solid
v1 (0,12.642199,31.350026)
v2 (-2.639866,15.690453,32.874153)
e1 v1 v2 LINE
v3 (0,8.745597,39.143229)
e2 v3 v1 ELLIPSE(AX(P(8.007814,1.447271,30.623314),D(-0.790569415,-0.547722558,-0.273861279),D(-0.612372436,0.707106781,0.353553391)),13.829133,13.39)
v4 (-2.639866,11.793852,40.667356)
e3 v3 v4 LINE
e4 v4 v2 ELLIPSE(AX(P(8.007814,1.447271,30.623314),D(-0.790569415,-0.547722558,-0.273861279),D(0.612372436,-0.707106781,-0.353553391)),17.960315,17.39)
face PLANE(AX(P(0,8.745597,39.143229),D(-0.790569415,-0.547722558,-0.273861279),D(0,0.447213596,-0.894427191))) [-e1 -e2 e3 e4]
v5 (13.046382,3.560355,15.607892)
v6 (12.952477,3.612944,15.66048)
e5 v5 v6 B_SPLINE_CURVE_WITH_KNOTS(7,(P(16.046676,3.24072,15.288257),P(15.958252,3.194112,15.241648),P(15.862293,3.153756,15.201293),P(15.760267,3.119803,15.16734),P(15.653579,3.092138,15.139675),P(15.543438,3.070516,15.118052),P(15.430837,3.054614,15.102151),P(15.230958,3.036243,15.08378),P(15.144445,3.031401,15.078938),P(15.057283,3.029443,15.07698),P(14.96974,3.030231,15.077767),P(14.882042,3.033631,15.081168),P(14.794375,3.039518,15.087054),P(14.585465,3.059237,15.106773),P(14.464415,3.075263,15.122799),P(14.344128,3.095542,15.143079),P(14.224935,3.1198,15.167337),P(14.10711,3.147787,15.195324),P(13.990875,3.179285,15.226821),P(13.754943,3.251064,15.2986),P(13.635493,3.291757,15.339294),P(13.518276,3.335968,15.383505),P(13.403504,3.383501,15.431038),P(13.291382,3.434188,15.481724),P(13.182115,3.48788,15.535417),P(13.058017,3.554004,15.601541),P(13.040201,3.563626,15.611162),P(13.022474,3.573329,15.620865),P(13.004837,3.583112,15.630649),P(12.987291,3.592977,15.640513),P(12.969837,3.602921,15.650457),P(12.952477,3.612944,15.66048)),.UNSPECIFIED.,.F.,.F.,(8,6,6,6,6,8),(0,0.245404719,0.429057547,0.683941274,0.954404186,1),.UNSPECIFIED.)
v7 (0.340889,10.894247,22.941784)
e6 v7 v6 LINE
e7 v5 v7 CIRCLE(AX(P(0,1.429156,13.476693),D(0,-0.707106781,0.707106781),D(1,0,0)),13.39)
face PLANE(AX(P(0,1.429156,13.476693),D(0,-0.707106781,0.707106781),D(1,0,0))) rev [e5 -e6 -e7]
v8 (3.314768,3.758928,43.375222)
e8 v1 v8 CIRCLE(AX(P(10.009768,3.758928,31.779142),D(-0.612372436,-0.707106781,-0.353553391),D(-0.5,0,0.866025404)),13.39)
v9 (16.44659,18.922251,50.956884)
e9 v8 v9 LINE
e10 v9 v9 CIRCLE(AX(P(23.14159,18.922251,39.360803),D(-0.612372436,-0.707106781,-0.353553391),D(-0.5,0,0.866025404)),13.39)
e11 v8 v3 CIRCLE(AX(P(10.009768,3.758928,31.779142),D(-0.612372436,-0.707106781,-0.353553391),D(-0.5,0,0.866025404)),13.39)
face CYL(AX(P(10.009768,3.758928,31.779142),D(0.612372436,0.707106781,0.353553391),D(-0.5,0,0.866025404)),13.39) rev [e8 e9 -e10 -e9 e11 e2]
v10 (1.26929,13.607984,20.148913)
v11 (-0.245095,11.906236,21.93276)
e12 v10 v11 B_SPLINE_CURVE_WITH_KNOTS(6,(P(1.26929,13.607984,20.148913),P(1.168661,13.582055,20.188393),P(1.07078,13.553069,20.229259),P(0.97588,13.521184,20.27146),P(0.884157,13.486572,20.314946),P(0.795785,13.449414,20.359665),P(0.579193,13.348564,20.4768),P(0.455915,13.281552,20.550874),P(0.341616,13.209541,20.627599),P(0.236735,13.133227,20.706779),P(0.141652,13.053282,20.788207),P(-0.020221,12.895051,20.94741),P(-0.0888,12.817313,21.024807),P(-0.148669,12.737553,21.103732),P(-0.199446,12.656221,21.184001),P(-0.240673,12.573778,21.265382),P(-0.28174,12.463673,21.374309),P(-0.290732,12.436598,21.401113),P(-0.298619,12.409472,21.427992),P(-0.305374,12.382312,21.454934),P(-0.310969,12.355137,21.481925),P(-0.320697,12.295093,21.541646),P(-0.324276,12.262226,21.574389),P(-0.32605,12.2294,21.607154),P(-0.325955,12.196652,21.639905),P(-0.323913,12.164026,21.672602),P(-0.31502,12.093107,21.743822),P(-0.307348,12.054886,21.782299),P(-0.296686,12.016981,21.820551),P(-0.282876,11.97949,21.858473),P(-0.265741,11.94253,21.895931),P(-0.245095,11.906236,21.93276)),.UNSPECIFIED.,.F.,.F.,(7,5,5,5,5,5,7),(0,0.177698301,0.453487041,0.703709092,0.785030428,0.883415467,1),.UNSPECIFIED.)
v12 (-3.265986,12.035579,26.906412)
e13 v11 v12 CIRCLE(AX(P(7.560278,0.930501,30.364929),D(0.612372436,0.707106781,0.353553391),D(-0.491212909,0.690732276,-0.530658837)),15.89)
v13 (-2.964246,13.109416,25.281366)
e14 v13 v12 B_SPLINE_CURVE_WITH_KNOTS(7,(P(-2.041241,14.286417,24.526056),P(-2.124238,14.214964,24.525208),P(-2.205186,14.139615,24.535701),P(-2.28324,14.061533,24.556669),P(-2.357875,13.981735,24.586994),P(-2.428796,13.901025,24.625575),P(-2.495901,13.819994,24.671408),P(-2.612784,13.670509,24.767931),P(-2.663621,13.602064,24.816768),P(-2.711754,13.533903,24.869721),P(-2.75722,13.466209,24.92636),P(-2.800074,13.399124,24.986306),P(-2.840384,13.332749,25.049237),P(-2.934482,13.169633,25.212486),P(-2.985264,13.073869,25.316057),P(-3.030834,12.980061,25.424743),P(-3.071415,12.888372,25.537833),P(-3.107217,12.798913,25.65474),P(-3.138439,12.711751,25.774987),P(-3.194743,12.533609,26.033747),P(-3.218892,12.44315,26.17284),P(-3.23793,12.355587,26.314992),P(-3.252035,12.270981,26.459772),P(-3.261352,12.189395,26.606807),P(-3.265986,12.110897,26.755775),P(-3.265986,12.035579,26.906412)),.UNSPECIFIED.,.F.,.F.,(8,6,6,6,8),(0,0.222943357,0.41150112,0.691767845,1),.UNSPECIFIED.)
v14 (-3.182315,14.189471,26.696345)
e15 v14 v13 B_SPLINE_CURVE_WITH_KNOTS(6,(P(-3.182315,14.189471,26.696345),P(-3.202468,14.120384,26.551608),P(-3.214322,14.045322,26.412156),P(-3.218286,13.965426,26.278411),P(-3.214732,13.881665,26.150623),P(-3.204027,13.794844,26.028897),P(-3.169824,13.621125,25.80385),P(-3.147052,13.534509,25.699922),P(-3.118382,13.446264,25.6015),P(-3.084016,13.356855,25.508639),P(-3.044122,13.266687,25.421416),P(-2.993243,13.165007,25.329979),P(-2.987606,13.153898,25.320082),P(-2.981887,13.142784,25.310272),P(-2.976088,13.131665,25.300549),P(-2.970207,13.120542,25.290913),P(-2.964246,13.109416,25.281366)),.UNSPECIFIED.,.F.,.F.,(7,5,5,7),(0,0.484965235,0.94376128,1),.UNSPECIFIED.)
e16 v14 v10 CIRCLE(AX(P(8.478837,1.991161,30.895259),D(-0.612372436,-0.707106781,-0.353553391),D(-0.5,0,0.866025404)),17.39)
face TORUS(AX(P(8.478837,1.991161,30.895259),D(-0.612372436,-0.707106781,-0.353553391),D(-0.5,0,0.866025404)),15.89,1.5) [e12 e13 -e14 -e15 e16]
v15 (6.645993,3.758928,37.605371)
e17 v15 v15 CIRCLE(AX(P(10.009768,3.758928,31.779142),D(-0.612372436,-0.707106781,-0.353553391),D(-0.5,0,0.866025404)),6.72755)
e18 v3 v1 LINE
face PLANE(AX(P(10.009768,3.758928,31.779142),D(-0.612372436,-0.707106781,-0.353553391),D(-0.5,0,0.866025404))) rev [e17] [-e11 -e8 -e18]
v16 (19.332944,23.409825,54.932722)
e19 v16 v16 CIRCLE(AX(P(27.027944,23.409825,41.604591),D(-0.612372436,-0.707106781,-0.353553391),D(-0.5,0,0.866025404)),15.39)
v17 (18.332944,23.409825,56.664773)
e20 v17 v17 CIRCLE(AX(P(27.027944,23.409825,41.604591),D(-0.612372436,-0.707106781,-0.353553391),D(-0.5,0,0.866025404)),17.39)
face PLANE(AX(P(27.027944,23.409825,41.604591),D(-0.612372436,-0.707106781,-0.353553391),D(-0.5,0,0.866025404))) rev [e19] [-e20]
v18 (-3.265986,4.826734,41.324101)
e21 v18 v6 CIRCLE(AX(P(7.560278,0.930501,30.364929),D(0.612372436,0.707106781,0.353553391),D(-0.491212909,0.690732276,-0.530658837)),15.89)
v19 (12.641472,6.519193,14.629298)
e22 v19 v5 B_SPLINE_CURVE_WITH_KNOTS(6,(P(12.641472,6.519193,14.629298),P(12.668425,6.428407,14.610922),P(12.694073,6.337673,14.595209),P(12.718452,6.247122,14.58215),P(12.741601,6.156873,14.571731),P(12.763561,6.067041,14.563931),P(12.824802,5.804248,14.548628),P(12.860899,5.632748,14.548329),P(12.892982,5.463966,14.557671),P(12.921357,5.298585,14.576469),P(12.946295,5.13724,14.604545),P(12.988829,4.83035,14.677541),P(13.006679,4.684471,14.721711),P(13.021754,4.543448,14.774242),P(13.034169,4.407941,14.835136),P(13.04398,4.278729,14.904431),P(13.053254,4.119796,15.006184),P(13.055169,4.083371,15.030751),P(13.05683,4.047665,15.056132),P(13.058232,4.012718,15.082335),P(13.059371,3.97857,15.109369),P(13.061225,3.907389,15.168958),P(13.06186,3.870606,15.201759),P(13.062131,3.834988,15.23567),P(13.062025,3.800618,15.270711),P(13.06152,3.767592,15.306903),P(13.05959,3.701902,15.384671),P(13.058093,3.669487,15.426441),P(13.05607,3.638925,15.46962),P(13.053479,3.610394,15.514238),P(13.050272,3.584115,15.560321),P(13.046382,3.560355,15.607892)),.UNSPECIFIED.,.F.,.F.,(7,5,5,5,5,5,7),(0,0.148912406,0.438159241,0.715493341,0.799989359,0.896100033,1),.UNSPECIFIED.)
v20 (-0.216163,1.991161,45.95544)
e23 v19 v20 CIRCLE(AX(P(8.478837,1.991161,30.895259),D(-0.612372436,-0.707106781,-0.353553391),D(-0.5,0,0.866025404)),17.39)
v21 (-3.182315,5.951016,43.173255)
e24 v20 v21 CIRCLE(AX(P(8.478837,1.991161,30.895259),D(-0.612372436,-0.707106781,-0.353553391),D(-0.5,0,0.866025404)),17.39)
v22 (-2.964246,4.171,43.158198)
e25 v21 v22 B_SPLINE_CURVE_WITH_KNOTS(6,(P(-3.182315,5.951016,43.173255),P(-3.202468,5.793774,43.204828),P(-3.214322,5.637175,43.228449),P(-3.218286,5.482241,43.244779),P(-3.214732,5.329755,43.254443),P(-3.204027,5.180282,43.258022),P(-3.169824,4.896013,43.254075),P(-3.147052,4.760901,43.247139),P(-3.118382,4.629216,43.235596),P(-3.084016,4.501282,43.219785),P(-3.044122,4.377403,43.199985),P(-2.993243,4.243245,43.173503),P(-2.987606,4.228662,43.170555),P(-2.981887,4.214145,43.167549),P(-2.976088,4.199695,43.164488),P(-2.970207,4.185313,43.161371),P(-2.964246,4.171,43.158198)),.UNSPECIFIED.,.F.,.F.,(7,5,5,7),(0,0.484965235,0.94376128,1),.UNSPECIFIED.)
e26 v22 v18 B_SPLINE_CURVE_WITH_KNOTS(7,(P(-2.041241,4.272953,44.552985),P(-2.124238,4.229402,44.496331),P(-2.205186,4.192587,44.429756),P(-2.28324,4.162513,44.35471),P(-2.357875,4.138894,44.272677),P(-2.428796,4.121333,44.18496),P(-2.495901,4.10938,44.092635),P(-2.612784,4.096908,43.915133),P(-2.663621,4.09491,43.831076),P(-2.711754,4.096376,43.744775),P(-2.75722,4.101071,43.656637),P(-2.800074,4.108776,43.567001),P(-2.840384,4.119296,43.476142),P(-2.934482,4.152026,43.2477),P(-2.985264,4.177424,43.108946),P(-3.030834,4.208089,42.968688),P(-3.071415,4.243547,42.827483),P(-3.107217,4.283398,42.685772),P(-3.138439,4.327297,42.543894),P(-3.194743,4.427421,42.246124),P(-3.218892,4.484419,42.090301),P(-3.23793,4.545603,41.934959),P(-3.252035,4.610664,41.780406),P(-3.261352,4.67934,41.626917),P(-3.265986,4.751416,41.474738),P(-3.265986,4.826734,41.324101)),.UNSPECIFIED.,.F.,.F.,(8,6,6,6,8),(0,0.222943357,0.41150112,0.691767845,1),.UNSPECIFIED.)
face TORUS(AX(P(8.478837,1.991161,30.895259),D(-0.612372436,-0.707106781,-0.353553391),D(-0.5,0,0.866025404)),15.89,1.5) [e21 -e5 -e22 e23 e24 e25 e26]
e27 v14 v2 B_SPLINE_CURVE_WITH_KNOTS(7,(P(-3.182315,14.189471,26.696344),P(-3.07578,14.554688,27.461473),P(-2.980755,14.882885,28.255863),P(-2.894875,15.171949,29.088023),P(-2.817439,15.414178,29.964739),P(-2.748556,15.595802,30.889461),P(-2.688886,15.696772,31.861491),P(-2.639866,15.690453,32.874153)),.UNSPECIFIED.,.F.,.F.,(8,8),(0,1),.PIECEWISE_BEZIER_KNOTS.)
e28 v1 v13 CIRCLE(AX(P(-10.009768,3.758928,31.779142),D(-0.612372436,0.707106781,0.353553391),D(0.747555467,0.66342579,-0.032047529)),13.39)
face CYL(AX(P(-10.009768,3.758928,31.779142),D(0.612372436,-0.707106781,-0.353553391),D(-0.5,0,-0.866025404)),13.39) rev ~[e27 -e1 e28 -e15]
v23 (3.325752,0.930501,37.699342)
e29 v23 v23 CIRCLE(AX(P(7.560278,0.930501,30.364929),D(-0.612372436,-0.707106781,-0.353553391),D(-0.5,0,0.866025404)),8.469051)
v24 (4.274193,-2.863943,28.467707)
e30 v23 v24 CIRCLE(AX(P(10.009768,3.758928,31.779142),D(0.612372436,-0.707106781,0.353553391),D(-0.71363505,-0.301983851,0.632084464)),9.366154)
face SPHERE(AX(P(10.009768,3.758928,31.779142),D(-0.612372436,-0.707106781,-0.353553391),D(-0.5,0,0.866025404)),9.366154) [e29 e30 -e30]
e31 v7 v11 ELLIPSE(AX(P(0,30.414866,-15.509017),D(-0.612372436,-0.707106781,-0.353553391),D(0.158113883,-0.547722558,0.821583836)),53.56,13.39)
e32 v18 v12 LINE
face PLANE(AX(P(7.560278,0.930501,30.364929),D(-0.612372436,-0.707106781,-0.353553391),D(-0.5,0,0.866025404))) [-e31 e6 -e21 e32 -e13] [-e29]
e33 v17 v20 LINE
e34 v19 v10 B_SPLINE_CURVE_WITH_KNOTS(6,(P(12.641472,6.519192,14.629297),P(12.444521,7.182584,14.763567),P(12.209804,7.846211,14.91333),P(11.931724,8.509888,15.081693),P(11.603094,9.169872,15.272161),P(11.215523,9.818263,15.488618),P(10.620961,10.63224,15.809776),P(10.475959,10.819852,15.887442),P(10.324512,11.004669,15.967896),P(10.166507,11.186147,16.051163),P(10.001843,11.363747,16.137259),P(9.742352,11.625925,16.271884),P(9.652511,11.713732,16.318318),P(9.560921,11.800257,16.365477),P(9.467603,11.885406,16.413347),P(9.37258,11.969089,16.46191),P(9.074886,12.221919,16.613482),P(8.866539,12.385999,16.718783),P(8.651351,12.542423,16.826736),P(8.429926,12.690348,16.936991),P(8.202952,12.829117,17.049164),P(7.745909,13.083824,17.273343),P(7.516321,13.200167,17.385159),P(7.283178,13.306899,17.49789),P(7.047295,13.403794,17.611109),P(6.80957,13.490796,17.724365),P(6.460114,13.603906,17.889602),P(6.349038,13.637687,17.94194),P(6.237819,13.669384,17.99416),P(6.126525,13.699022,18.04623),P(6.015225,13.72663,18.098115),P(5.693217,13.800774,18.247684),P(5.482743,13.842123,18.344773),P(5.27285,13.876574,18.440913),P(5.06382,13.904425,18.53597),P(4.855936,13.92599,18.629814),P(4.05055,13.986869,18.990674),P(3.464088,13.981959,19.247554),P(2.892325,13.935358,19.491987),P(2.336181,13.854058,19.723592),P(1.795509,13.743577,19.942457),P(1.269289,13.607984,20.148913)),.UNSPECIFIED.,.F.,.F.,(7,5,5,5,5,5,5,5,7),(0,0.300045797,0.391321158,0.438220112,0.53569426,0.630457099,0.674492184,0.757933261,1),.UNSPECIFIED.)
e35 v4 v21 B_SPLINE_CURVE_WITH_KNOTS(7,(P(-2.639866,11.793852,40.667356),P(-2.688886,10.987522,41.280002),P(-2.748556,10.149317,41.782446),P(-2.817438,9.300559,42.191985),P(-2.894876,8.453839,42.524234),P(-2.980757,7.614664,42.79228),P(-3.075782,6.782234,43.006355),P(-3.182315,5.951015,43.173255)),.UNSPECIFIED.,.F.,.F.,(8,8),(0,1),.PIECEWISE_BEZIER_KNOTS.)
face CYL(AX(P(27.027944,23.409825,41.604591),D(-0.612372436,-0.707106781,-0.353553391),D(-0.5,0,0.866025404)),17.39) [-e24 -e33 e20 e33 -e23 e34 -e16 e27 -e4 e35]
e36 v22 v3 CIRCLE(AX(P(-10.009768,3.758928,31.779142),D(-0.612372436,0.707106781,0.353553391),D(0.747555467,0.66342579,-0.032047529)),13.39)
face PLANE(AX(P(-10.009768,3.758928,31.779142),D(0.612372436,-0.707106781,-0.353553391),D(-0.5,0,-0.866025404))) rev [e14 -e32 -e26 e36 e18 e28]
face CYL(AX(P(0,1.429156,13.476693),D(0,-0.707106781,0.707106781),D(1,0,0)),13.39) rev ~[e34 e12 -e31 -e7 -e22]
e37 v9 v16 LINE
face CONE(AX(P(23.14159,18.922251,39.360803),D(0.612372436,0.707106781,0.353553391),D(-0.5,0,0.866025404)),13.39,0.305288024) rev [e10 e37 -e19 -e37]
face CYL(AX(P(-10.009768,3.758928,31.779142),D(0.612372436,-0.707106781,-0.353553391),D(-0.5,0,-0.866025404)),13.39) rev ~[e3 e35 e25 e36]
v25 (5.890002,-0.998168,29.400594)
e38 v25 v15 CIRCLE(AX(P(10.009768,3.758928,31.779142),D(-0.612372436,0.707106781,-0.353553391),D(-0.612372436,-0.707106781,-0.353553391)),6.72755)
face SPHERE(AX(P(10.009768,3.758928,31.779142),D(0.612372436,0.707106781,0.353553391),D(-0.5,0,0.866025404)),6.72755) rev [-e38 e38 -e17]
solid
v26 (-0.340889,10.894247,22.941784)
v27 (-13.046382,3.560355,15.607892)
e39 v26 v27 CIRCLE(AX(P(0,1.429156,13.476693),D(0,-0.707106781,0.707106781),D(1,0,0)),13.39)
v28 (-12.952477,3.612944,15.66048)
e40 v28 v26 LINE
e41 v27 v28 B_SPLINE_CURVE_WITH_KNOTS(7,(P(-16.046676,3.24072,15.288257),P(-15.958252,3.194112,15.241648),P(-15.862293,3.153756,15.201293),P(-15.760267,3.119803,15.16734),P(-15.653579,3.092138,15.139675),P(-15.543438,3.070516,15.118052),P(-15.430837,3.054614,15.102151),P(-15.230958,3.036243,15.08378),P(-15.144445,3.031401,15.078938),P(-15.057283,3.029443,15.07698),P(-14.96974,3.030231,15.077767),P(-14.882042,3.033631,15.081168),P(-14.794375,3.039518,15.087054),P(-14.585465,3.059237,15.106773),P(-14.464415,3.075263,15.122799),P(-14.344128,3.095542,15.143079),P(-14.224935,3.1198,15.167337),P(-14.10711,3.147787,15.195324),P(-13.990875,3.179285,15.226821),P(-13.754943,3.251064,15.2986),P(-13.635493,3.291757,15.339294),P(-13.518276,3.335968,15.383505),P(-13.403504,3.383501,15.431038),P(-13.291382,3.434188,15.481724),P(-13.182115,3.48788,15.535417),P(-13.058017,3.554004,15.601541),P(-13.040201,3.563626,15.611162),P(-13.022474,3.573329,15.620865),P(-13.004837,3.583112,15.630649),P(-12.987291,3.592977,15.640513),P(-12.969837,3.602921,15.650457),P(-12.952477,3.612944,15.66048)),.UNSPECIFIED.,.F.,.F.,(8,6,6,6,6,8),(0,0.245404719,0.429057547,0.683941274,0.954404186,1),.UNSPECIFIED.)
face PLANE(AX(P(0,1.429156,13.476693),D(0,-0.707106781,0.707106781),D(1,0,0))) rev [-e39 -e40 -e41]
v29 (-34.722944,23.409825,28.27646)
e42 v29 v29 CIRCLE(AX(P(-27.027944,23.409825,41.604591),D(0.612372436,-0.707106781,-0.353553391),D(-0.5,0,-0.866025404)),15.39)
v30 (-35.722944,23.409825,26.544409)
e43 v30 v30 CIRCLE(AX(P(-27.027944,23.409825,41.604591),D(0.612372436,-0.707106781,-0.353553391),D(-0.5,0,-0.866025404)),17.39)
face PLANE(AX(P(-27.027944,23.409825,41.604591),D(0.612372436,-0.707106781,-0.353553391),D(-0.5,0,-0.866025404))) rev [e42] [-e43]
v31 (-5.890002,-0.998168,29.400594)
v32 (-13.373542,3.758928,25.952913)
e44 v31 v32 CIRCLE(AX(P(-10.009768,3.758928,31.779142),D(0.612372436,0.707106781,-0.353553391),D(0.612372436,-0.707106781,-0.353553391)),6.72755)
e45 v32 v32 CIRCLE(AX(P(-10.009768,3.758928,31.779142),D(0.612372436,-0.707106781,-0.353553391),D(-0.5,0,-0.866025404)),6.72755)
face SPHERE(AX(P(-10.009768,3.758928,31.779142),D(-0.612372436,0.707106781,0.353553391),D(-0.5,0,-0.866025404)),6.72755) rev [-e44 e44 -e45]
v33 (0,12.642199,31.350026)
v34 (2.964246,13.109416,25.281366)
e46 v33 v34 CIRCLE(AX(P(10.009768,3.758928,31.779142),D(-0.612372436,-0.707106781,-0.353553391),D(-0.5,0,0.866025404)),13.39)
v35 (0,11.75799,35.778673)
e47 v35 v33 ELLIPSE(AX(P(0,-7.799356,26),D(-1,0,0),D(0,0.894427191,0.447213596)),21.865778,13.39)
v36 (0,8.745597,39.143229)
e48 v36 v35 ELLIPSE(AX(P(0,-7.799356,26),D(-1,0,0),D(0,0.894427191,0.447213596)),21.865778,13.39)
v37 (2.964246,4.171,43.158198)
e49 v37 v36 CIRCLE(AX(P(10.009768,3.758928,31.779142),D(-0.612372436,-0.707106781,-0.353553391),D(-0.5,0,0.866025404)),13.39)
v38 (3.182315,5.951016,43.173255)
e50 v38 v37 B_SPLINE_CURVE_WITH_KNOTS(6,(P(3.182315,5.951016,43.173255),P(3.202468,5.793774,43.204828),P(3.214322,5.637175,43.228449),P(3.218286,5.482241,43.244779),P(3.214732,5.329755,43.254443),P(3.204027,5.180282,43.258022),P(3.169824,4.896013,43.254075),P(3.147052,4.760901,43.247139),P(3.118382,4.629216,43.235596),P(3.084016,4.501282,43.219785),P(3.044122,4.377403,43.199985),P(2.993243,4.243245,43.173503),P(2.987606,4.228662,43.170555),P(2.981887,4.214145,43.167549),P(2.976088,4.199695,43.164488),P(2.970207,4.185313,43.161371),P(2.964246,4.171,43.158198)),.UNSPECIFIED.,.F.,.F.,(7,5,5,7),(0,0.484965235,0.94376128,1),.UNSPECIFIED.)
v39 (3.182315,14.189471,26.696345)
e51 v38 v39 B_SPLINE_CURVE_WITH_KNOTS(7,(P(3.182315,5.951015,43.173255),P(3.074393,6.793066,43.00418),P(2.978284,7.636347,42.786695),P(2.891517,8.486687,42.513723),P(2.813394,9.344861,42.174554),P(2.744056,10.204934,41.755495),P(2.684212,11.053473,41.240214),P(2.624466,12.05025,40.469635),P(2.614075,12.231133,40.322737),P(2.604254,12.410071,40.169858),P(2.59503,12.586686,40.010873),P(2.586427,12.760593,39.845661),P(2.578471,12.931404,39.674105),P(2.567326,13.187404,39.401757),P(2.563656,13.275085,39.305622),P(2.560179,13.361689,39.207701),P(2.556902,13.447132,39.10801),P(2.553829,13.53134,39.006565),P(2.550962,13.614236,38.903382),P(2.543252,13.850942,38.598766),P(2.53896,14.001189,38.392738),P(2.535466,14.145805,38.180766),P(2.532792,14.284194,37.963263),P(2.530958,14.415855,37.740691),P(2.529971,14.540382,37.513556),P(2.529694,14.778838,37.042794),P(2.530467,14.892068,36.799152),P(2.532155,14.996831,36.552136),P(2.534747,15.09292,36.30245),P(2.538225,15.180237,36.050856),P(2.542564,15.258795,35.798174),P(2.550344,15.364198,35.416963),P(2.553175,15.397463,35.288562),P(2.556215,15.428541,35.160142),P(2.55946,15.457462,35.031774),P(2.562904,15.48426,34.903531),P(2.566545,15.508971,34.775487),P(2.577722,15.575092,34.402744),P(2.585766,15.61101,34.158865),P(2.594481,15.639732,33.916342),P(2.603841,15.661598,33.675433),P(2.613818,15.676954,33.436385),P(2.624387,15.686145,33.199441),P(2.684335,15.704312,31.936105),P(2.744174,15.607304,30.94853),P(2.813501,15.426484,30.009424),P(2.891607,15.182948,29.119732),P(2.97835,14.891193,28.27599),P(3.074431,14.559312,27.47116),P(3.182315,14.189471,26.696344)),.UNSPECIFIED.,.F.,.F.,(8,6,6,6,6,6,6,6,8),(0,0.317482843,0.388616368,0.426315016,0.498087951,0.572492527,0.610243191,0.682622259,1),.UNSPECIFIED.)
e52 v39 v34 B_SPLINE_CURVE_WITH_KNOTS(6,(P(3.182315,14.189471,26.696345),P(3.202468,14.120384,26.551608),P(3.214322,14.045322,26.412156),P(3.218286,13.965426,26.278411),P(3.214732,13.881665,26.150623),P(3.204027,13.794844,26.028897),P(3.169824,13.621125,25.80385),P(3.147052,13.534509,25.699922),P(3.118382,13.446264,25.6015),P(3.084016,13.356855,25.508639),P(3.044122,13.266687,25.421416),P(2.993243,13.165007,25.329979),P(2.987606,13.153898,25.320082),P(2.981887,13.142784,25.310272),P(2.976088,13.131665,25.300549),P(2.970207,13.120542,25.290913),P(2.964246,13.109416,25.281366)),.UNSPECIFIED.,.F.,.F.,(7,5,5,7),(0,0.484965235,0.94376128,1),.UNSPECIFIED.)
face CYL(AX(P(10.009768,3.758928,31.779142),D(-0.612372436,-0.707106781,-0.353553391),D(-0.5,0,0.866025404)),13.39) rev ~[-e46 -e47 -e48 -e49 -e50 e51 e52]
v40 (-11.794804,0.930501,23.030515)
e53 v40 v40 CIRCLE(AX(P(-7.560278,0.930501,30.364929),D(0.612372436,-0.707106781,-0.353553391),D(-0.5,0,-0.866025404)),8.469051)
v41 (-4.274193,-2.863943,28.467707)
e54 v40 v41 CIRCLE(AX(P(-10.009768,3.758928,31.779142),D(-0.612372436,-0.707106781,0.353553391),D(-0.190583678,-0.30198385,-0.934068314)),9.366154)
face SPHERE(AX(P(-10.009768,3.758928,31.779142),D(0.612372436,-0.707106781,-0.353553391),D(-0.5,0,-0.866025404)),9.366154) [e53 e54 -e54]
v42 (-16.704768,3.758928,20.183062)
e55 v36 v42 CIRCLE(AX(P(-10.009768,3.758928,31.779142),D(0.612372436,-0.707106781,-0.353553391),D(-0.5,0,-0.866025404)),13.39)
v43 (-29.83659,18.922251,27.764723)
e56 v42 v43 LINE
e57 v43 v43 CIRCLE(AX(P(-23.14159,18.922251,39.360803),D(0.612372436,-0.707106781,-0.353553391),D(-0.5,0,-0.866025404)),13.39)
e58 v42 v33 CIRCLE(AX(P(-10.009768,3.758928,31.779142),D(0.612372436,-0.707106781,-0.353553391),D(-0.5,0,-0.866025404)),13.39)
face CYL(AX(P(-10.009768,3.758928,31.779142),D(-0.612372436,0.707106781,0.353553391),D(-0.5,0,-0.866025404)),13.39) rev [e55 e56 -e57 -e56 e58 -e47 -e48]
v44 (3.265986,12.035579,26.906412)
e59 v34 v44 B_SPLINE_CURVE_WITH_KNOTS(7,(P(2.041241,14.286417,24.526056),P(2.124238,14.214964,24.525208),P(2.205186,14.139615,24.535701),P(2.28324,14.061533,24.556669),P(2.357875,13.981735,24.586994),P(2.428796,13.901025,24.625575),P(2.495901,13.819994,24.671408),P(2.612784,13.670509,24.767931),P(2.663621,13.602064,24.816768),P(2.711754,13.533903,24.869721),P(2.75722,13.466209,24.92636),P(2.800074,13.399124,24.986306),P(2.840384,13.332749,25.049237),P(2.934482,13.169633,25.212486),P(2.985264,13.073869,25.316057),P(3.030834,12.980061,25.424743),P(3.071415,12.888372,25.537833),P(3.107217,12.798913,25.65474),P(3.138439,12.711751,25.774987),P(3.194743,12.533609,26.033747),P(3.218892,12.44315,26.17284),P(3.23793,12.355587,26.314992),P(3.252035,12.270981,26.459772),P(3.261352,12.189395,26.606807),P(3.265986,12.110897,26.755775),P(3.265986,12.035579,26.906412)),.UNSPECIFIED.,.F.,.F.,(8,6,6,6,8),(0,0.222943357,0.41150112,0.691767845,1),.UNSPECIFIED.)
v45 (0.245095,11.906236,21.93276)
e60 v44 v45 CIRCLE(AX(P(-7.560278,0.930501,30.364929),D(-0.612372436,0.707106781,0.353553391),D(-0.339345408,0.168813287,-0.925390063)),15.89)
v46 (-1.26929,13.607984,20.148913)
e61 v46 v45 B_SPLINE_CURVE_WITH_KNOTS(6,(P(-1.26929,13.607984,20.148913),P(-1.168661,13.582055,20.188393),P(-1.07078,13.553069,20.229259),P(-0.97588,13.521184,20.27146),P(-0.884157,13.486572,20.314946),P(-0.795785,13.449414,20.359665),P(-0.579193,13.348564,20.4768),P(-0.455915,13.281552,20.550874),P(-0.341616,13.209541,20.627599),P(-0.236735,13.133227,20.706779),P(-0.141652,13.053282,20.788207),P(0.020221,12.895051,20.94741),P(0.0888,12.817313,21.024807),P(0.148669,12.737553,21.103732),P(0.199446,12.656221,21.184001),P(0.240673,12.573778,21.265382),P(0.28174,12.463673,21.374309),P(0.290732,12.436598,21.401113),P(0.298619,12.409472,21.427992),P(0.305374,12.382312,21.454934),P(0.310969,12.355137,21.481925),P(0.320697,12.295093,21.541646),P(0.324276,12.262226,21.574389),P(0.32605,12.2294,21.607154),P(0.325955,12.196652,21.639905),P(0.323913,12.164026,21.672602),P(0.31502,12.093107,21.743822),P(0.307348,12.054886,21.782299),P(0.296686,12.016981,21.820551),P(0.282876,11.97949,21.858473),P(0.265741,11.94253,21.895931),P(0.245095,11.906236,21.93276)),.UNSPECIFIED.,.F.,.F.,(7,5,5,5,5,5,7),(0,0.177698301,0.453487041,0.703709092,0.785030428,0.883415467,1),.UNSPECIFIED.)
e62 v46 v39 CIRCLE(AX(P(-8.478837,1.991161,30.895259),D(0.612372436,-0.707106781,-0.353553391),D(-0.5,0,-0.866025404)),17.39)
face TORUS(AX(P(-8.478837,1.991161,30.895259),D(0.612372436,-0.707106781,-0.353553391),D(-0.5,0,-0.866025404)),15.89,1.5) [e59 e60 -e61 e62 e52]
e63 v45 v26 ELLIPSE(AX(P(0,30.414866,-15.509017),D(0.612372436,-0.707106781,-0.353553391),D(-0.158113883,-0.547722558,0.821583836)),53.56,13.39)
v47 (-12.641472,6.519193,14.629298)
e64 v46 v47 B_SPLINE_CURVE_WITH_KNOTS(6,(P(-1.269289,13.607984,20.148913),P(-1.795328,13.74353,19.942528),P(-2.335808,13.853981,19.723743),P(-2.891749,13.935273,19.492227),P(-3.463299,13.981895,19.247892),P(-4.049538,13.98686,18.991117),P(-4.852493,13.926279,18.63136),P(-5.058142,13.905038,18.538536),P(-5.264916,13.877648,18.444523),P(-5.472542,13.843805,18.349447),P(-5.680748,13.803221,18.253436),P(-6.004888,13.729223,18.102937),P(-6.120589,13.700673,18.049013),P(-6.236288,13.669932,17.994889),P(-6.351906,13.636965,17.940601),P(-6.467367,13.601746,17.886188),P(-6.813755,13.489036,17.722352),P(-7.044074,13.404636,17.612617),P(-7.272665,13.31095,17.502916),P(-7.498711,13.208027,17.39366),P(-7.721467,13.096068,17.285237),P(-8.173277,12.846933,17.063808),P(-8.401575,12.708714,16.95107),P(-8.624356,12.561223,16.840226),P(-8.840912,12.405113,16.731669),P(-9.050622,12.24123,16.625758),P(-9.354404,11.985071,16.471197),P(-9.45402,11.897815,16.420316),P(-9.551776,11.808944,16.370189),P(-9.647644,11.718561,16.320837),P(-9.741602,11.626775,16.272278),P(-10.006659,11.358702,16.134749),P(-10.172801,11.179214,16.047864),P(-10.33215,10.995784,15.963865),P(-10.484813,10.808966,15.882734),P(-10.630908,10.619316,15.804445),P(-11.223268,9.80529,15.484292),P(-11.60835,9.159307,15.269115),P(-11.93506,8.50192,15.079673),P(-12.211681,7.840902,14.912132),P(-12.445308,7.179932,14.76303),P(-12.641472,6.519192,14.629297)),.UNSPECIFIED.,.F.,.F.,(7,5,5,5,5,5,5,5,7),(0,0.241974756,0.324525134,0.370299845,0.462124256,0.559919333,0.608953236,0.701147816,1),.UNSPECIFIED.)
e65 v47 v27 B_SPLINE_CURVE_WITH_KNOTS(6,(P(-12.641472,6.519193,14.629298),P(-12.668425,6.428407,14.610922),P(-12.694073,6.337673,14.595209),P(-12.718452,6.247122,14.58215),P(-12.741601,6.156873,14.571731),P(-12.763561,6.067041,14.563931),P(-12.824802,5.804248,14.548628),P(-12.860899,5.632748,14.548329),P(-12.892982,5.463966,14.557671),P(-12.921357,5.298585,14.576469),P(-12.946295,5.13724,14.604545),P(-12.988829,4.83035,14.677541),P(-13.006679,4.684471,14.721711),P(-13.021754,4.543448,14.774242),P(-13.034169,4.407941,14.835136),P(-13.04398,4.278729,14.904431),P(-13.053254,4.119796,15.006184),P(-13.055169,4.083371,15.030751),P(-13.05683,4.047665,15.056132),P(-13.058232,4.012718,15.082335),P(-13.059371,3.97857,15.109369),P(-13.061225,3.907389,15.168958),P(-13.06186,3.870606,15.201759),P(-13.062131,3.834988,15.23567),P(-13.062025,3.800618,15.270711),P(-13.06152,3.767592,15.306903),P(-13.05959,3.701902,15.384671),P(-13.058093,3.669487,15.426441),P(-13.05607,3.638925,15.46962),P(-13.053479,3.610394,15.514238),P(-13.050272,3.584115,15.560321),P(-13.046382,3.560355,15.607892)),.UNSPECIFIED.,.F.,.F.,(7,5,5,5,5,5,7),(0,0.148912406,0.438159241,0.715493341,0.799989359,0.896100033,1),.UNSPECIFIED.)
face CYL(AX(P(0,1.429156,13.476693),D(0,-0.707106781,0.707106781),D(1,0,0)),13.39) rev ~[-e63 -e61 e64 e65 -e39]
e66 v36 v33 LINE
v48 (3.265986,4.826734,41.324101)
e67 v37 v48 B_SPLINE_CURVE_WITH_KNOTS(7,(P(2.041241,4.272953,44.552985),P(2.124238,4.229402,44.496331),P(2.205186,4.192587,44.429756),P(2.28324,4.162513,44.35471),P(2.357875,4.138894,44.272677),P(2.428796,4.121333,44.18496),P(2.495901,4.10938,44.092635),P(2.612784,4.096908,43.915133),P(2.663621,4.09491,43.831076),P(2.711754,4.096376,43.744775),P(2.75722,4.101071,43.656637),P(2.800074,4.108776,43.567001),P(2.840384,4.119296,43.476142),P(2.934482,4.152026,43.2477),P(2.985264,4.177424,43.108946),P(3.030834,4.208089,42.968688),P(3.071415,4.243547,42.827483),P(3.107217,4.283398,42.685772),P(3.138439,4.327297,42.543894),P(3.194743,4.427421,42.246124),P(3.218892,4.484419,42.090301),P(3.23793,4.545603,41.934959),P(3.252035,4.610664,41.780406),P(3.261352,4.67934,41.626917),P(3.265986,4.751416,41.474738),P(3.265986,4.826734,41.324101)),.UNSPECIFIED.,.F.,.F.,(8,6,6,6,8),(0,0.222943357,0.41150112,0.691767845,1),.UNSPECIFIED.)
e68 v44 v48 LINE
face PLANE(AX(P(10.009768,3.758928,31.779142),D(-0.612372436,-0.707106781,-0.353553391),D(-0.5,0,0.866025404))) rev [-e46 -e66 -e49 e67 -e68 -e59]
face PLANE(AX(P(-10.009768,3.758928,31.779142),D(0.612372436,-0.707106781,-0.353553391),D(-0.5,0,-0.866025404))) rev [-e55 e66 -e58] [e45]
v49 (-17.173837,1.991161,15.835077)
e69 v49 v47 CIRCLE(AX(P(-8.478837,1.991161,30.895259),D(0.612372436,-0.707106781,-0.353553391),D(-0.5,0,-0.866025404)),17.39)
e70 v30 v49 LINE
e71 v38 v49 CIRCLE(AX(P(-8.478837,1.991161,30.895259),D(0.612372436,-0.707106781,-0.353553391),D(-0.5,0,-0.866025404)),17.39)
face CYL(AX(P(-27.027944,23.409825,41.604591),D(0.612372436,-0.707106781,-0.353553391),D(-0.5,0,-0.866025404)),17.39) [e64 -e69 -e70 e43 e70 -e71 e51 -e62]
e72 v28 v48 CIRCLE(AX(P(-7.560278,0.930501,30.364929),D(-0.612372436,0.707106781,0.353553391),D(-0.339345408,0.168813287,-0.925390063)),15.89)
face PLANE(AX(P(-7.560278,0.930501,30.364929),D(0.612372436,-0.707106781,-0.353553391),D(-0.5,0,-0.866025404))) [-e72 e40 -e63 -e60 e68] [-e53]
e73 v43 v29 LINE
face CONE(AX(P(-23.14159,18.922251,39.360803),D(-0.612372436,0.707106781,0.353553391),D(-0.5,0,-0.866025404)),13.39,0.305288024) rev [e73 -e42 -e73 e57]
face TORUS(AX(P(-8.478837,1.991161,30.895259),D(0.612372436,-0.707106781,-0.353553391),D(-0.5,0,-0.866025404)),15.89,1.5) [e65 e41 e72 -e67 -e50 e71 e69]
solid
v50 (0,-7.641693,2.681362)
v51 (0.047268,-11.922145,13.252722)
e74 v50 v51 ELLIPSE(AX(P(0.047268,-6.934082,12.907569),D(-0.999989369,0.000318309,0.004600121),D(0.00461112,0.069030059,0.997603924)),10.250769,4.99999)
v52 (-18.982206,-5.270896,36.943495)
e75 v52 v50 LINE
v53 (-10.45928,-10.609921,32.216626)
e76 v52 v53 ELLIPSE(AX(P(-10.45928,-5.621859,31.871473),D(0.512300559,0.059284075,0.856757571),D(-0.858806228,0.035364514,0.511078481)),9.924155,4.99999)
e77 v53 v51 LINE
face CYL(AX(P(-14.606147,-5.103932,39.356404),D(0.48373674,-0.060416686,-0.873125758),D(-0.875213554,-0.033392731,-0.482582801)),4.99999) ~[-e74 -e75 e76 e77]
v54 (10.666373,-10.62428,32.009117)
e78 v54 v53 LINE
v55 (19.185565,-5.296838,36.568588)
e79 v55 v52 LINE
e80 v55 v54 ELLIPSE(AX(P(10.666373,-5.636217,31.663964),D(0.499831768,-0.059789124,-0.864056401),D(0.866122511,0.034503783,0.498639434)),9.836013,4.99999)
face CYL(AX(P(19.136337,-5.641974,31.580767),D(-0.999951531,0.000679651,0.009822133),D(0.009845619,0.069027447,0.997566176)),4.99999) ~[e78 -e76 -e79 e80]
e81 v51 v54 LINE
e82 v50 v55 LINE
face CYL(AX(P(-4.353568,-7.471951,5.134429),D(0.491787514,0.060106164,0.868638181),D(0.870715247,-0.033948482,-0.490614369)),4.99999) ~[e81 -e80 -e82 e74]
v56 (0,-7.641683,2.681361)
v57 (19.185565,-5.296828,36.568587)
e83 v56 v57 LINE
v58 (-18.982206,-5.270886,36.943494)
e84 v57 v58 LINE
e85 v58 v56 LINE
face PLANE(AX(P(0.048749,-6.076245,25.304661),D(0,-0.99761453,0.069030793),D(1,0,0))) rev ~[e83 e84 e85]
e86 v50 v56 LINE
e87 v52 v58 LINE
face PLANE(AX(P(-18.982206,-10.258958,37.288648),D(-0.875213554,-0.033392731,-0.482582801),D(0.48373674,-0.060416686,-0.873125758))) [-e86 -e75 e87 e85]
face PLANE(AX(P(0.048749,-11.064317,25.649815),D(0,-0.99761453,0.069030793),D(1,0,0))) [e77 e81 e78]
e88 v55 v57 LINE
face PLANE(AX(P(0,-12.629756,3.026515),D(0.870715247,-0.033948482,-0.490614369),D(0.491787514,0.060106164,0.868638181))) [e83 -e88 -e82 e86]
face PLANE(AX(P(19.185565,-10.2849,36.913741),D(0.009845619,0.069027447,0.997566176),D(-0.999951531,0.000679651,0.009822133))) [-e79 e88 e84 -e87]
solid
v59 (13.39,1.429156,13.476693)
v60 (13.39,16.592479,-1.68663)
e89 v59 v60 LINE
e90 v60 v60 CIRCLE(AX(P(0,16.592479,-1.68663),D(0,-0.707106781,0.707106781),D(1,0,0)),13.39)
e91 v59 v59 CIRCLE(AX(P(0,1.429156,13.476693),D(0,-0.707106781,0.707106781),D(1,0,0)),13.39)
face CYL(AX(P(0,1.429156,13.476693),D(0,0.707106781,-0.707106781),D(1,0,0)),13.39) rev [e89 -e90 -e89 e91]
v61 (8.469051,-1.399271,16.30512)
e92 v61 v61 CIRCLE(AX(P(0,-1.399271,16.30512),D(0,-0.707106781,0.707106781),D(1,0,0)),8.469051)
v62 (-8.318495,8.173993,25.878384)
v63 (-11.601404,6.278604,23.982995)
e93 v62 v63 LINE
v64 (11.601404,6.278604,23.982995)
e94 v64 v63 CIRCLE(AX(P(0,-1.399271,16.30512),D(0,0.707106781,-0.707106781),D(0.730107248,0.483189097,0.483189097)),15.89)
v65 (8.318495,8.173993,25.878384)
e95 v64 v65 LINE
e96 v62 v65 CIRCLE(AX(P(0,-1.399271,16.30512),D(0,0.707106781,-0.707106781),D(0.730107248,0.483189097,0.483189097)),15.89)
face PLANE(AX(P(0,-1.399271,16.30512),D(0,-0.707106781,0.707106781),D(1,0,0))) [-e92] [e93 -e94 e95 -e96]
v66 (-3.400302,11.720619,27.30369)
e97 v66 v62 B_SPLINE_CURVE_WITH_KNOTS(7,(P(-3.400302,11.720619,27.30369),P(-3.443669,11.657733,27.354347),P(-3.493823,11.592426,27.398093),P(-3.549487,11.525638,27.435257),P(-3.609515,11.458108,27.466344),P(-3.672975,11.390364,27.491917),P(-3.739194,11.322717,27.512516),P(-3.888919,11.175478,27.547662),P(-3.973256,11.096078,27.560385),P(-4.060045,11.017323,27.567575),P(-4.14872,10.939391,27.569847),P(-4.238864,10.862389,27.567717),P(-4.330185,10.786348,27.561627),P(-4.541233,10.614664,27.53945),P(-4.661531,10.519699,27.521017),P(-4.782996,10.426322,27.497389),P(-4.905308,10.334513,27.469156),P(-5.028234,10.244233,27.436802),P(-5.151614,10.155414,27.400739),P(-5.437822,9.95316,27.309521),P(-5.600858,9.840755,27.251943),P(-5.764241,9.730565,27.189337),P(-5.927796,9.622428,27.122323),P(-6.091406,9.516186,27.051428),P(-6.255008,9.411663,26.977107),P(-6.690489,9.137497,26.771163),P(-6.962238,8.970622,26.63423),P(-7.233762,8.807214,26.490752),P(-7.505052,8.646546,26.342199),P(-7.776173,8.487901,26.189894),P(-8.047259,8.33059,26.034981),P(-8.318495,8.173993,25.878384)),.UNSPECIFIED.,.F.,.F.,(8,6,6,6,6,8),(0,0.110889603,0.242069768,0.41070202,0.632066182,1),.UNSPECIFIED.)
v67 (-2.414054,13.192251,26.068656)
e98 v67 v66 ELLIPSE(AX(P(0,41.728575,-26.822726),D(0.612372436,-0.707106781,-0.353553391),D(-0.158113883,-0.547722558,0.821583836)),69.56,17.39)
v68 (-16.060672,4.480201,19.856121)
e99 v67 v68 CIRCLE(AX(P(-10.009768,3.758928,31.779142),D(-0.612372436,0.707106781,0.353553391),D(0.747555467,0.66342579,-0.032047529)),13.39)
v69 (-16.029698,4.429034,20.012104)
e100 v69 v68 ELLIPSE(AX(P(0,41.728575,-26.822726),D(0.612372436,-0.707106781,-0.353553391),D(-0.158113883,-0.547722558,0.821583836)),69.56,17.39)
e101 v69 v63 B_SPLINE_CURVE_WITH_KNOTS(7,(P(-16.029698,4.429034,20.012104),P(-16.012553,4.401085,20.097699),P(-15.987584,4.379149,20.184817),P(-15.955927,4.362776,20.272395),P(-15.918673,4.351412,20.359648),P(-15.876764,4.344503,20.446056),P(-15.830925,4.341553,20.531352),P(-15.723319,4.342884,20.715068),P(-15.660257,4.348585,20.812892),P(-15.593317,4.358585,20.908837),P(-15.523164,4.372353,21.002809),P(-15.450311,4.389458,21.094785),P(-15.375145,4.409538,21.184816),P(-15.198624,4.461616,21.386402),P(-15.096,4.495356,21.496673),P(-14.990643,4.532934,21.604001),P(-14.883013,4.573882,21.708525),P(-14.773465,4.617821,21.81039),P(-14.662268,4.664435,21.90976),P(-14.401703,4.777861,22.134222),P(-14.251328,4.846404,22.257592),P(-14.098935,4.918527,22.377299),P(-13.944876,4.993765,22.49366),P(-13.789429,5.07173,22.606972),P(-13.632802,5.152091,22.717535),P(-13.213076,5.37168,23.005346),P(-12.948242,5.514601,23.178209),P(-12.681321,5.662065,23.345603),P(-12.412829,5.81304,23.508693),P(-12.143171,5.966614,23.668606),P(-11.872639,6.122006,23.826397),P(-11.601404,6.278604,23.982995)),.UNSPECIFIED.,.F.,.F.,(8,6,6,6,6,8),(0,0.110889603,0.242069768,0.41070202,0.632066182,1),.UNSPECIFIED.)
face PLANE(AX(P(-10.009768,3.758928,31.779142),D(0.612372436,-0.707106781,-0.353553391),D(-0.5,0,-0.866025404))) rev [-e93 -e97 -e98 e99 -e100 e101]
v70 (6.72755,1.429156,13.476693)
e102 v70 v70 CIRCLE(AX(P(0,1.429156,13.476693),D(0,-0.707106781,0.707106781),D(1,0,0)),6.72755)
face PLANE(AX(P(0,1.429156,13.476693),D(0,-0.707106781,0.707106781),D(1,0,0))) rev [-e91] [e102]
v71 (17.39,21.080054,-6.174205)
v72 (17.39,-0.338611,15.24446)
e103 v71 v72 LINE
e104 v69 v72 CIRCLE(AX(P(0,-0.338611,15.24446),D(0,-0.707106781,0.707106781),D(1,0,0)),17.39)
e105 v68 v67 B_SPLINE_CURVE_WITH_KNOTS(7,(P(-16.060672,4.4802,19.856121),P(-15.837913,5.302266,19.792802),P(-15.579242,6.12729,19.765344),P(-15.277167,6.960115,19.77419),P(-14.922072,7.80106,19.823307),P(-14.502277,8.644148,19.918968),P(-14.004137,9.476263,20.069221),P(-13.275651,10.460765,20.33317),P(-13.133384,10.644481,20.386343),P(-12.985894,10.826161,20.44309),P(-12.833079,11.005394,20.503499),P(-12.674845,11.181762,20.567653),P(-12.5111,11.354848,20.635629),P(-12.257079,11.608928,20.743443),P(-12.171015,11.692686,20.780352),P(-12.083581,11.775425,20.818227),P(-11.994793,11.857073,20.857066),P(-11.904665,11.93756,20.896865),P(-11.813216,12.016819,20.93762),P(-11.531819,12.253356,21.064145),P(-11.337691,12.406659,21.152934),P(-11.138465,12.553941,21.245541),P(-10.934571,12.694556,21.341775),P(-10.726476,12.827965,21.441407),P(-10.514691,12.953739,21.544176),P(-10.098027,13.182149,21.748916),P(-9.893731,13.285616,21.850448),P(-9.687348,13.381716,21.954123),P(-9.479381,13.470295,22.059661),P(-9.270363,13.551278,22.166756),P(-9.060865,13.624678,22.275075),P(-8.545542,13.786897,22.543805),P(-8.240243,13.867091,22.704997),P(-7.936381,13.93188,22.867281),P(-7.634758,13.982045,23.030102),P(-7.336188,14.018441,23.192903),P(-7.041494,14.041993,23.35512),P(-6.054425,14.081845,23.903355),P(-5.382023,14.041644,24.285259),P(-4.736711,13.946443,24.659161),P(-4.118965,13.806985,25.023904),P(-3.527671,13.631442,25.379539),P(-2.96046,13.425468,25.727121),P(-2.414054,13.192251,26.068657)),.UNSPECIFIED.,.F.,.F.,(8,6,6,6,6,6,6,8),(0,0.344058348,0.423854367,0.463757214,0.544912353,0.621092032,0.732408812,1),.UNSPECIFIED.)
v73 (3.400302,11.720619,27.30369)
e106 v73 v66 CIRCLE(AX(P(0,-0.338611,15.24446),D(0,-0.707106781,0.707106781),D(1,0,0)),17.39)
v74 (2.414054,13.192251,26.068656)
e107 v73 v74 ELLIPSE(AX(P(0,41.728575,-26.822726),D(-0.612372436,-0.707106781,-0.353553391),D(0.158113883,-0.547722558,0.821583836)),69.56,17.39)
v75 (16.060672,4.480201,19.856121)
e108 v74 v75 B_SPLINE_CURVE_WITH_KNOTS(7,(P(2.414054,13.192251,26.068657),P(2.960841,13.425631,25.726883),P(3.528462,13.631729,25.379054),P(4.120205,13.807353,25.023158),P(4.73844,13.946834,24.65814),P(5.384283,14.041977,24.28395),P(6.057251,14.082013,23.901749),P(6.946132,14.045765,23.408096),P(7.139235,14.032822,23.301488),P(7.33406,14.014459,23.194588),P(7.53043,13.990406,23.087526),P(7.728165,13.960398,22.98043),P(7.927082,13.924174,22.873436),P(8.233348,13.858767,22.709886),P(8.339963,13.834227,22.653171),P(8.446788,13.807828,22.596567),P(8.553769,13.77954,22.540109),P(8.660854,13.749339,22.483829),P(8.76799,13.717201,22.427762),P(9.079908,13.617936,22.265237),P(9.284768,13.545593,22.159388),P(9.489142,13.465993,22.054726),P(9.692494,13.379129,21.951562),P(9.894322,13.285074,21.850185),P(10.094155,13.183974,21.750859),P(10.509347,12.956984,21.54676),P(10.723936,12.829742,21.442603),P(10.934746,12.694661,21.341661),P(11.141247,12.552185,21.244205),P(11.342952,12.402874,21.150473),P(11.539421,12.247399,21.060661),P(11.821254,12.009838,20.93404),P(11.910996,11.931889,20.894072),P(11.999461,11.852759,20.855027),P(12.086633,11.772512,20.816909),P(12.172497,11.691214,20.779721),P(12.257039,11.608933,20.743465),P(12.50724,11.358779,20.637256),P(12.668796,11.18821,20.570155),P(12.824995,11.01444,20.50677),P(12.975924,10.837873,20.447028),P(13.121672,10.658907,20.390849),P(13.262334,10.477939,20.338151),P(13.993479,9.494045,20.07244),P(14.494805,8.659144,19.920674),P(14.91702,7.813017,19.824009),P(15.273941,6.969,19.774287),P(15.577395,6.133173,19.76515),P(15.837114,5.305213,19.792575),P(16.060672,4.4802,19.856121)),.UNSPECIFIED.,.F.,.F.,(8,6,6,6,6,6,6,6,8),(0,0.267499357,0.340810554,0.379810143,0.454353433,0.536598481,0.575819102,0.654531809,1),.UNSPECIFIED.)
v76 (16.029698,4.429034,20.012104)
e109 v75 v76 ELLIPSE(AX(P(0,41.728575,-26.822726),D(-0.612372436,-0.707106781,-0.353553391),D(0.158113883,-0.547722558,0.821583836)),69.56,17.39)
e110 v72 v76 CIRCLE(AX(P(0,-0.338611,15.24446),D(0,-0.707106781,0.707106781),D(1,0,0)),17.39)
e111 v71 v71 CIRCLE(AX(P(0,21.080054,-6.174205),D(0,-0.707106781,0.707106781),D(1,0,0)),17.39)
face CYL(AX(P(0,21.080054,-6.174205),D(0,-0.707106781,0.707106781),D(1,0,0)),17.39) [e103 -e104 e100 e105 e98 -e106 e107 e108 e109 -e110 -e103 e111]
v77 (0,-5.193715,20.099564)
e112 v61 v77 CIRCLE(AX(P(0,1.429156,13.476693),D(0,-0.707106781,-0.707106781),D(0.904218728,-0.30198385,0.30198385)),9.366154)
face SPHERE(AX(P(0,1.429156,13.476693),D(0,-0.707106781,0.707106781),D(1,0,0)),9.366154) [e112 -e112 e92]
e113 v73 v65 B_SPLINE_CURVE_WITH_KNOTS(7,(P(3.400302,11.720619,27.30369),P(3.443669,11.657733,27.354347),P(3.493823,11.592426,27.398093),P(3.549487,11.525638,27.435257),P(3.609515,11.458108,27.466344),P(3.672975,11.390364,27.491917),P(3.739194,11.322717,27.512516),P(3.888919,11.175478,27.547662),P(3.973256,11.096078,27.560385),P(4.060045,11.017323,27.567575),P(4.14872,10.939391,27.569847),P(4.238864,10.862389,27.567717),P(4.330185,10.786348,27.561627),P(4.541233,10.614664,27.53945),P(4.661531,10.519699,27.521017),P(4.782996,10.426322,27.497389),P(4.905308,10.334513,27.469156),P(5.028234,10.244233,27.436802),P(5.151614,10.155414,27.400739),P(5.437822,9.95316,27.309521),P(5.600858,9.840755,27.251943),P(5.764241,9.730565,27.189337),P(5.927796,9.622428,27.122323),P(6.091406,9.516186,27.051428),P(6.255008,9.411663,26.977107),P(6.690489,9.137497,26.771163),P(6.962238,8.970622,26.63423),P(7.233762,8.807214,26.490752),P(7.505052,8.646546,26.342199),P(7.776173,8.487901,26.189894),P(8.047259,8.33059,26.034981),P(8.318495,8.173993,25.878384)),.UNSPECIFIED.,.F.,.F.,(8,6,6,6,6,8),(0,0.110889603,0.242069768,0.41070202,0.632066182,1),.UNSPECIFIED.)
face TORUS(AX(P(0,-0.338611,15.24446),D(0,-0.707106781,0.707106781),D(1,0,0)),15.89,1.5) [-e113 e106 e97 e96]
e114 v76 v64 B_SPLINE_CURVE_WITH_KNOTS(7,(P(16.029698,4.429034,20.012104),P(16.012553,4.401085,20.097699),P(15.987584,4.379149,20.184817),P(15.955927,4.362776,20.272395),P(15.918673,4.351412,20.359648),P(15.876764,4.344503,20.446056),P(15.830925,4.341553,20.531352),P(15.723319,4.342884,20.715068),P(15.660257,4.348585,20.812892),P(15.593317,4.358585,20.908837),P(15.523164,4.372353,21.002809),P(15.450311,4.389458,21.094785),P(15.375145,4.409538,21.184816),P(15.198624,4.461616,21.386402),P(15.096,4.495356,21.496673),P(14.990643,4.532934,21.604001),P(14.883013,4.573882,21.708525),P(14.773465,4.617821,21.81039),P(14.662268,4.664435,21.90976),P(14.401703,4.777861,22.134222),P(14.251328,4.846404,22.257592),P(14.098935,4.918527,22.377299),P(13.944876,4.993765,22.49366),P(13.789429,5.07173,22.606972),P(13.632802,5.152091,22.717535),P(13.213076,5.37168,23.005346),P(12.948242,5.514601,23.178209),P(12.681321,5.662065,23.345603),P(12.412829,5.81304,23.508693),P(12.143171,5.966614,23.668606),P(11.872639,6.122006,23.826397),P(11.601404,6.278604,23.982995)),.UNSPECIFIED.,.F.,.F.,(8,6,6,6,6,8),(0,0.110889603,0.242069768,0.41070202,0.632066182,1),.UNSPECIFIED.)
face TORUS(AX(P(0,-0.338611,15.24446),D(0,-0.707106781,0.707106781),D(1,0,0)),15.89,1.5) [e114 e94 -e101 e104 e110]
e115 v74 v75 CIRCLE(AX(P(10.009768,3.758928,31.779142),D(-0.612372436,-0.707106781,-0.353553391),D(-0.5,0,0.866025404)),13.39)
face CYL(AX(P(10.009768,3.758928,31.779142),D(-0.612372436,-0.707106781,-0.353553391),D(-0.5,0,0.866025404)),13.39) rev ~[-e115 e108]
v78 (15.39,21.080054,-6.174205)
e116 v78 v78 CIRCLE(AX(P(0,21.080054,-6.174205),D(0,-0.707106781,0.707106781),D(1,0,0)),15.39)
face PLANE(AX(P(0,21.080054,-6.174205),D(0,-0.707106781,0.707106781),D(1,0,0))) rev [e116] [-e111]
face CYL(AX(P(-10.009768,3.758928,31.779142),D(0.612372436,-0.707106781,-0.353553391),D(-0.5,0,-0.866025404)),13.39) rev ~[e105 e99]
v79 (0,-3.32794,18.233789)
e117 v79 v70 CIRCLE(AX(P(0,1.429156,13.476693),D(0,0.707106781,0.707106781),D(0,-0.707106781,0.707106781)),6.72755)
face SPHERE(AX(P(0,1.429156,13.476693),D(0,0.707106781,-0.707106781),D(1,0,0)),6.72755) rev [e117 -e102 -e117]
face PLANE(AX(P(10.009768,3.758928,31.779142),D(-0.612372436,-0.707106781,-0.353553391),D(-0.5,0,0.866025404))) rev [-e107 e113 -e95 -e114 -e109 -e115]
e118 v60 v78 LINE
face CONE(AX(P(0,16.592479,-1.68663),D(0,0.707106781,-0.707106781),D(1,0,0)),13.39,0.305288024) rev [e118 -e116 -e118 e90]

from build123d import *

# Parameters (mm, degrees)
F2_R      = 1.5
F4_COUNT  = 3
F6_ANGLE  = 45
F7_ANGLE  = -45
F8_ANGLE  = 45
F9_DEPTH  = 27.79057
F10_DEPTH = 27.79057
F11_DEPTH = 27.79057
F17_DEPTH = 5
F18_R     = 4.99999


# Not quite as in the source:
# - a fillet or chamfer is up to 0.001 mm smaller than in the source, because OpenCascade refuses the exact size


with BuildPart() as f1:
    # F0 (on Front) → F1 (revolve)
    with BuildSketch(Plane.XZ):
        with BuildLine():
            Line((9.3661535876, 12.8847169811), (13.39, 12.8847169811))
            Line((13.39, 12.8847169811), (13.39, -8.5594598204))
            Line((13.39, -8.5594598204), (15.39, -14.9058490566))
            Line((15.39, -14.9058490566), (17.39, -14.9058490566))
            Line((17.39, -14.9058490566), (17.39, 16.8847169811))
            Line((17.39, 16.8847169811), (8.4690514833, 16.8847169811))
            ThreePointArc((8.4690514833, 16.8847169811), (5.0129940493, 20.7963997154), (0, 22.2508705687))
            Line((0, 22.2508705687), (0, 19.6122665526))
            ThreePointArc((0, 19.6122665526), (4.7570959228, 17.6418129039), (6.7275495715, 12.8847169811))
            Line((6.7275495715, 12.8847169811), (9.3661535876, 12.8847169811))
        make_face()
    revolve(axis=Axis((0, 0, 12.7783455608), (0, 0, 1)))

    # F2
    f2_edges = [f1.edges().sort_by_distance(p)[0] for p in [
        (-17.39, 0, 16.884717),
    ]]
    fillet(f2_edges, radius=F2_R)


with BuildPart() as f4_1:
    # F4: instance of F1
    add(f1.part.rotate(Axis((0, -13.616835, 26), (0, 1, 0)), 1 * 360 / F4_COUNT))


with BuildPart() as f4_2:
    # F4: instance of F1
    add(f1.part.rotate(Axis((0, -13.616835, 26), (0, 1, 0)), 2 * 360 / F4_COUNT))


with BuildPart() as f1_1:
    add(f1.part)

    # F0 (on Front) → F5 (revolve, cut)
    with BuildSketch(Plane.XZ):
        Polygon((13.39, -8.5594598204), (13.39, 12.8847169811), (9.3661535876, 12.8847169811), (6.7275495715, 12.8847169811), (0, 12.8847169811), (0, -10.1359616965), (13.39, -10.1359616965), align=None)
    revolve(axis=Axis((0, 0, 1.3743776423), (0, 0, 1)), mode=Mode.SUBTRACT)


with BuildPart() as f1_2:
    # F6: moved
    add(f1_1.part.rotate(Axis((-3.022489244, 0, 14.9058490566), (1, 0, 0)), F6_ANGLE))


with BuildPart() as f4_1_1:
    # F7: moved
    add(f4_1.part.rotate(Axis((-7.7055660377, 0, 28.2522809351), (0.5, 0, 0.8660254038)), F7_ANGLE))


with BuildPart() as f4_2_1:
    # F8: moved
    add(f4_2.part.rotate(Axis((7.7055660377, 0, 28.2522809351), (-0.5, 0, 0.8660254038)), F8_ANGLE))


with BuildPart() as f9_tool:
    # F9 (cut): a face of the model
    f9_faces = [f1_2.part.faces().sort_by_distance(p)[0] for p in [
        (-13.011273608, 1.4291561963, 13.4766928604),
    ]]
    extrude(f9_faces, amount=F9_DEPTH)


with BuildPart() as f4_1_2:
    add(f4_1_1.part)

    # F9: cut by f9_tool
    add(f9_tool.part, mode=Mode.SUBTRACT)


with BuildPart() as f4_2_2:
    add(f4_2_1.part)

    # F9: cut by f9_tool
    add(f9_tool.part, mode=Mode.SUBTRACT)


with BuildPart() as f10_tool:
    # F10 (cut): a face of the model
    f10_faces = [f4_2_2.part.faces().sort_by_distance(p)[0] for p in [
        (16.5154045129, 3.7589277557, 20.5110486011),
    ]]
    extrude(f10_faces, amount=F10_DEPTH)


with BuildPart() as f1_3:
    add(f1_2.part)

    # F10: cut by f10_tool
    add(f10_tool.part, mode=Mode.SUBTRACT)


with BuildPart() as f4_1_3:
    add(f4_1_2.part)

    # F10: cut by f10_tool
    add(f10_tool.part, mode=Mode.SUBTRACT)


with BuildPart() as f11_tool:
    # F11 (cut): a face of the model
    f11_faces = [f4_1_3.part.faces().sort_by_distance(p)[0] for p in [
        (-7.192664292, 11.3085047439, 21.5593543531),
    ]]
    extrude(f11_faces, amount=F11_DEPTH)


with BuildPart() as f1_4:
    add(f1_3.part)

    # F11: cut by f11_tool
    add(f11_tool.part, mode=Mode.SUBTRACT)


with BuildPart() as f4_2_3:
    add(f4_2_2.part)

    # F11: cut by f11_tool
    add(f11_tool.part, mode=Mode.SUBTRACT)


with BuildPart() as f17:
    # F16 (on 3pt) → F17 (new body)
    with BuildSketch(Plane(origin=(0, -12.7779963754, 0.8841844204), x_dir=(1, 0, 0), z_dir=(0, -0.9976145296, 0.0690307931))):
        Polygon((19.185565412, 36.1157096922), (-18.9822055399, 36.4915132523), (0, 2.1474533714), align=None)
    extrude(amount=-F17_DEPTH)

    # F18 (radius 5 in the source; OpenCascade refuses exactly that, so slightly less here)
    f18_edges = [f17.edges().sort_by_distance(p)[0] for p in [
        (9.592783, -11.457328, 19.970128),
        (0.10168, -10.271929, 37.101195),
        (-9.491103, -11.444357, 20.157582),
    ]]
    fillet(f18_edges, radius=F18_R)


solid = Compound([f4_1_3.part, f1_4.part, f4_2_3.part, f17.part])
